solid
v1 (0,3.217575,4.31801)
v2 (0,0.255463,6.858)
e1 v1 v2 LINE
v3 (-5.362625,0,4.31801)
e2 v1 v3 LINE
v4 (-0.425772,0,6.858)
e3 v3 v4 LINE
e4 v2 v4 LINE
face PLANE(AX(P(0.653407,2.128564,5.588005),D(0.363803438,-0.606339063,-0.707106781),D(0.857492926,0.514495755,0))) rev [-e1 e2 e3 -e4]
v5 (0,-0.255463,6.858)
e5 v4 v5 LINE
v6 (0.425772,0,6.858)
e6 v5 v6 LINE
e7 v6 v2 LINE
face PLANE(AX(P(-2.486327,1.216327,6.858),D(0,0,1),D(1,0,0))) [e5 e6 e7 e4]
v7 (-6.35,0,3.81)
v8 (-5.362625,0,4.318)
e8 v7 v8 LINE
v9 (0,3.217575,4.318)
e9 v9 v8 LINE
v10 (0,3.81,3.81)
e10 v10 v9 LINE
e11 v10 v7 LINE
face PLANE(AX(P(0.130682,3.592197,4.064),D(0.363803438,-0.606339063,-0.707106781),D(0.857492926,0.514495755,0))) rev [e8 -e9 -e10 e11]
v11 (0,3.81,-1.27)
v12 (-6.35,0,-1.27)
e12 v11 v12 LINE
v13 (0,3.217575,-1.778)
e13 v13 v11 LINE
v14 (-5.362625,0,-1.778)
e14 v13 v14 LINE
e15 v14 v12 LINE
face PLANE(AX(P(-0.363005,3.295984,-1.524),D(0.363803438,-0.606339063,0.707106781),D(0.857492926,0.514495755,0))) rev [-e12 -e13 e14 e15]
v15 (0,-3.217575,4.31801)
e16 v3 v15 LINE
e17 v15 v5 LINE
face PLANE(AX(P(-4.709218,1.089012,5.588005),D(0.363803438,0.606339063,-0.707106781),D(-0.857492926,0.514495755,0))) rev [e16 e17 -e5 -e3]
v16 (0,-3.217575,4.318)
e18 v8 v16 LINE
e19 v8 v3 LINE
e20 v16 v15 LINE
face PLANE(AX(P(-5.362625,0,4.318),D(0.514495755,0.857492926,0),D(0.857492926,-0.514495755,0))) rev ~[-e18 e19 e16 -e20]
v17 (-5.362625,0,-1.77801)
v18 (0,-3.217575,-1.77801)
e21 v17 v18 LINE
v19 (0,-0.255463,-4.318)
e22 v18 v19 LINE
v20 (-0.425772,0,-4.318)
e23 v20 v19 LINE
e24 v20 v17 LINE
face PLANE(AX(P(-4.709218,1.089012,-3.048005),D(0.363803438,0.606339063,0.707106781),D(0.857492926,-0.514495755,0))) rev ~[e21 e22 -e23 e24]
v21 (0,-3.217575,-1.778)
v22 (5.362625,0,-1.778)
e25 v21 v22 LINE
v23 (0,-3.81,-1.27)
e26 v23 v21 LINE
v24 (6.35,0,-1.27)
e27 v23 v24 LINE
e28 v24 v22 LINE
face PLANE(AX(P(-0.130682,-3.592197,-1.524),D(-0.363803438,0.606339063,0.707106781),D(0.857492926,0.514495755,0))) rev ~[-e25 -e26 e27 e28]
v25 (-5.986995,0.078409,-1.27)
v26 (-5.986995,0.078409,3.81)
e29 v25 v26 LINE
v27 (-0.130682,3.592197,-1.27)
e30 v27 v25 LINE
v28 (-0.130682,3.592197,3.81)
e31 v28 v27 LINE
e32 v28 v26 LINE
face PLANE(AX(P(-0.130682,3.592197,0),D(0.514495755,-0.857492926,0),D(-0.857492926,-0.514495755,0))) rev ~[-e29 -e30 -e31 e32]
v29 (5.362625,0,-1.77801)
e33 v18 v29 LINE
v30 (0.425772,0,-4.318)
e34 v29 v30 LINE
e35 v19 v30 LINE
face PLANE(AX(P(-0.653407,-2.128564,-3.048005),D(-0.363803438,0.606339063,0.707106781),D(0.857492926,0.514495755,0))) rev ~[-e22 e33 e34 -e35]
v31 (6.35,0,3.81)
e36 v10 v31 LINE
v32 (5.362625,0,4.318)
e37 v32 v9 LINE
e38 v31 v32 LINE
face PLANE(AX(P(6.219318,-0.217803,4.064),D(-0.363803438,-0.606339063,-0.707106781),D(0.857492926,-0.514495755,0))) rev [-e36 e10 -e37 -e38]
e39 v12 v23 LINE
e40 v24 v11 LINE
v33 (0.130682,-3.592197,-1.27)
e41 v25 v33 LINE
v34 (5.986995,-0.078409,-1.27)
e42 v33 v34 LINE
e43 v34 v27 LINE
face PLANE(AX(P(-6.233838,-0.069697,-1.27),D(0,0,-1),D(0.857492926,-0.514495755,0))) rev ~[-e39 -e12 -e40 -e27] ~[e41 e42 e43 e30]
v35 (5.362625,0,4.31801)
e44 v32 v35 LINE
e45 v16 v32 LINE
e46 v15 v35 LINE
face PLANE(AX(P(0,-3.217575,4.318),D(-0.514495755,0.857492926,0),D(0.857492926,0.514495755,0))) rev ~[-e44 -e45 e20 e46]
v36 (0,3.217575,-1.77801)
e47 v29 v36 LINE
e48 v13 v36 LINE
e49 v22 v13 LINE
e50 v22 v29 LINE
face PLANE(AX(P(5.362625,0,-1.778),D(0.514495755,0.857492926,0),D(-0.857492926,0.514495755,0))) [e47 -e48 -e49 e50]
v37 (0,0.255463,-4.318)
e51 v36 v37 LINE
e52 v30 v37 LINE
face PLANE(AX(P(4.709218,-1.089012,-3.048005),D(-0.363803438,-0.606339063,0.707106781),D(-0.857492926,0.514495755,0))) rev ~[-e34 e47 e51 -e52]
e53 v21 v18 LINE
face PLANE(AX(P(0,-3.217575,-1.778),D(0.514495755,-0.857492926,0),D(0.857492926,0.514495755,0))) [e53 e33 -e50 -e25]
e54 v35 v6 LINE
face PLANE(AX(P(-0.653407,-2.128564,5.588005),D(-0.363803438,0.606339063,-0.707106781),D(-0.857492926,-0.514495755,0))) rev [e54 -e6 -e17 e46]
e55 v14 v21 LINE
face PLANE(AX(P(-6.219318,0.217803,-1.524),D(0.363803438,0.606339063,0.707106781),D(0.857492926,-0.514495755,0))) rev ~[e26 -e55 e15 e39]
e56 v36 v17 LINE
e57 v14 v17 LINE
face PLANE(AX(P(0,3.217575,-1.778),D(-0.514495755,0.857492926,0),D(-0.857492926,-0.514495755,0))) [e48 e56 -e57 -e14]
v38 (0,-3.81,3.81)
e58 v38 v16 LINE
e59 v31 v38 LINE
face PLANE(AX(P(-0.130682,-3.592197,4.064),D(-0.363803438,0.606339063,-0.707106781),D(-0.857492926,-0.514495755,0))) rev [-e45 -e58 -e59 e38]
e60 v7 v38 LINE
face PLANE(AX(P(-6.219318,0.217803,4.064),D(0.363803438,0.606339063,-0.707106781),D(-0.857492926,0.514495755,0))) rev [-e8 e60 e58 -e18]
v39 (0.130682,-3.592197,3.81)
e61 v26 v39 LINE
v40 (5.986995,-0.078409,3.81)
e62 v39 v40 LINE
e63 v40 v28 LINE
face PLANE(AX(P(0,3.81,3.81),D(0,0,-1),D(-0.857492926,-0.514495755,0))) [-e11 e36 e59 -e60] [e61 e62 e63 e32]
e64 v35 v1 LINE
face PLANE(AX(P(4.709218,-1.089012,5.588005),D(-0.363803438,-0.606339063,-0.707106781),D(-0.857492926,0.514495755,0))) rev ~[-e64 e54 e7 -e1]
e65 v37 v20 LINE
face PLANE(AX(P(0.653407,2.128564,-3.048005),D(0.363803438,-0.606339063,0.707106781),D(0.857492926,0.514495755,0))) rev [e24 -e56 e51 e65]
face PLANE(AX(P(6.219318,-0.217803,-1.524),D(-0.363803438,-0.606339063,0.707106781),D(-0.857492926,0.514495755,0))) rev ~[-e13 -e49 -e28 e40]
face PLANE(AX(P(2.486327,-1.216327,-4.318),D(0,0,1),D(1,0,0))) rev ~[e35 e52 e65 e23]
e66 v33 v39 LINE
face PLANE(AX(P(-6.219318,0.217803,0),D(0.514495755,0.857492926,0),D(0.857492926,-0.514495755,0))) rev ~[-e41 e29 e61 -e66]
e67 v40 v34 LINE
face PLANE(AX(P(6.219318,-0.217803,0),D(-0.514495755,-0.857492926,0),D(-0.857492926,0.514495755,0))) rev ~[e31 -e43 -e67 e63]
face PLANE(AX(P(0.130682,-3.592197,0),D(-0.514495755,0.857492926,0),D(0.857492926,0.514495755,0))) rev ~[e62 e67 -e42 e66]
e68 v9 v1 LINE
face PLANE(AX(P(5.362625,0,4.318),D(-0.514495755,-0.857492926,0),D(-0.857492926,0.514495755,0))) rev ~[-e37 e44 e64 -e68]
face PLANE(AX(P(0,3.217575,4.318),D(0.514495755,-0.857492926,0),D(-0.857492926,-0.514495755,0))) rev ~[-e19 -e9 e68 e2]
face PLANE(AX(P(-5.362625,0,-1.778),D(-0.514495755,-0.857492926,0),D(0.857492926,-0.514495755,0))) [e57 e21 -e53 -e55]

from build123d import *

# Parameters (mm, degrees)
F1_DEPTH  = 4.318
F2_DEPTH  = 1.778
F3_SIZE   = 0.508
F4_SIZE   = 0.508
F5_SIZE   = 0.508
F6_DEPTH  = 2.54
F7_DEPTH  = 2.54
F8_SIZE   = 2.53999
F9_SIZE   = 2.53999
F11_DEPTH = 0.254
F12_DEPTH = 0.254


# Not quite as in the source:
# - a fillet or chamfer is up to 0.001 mm smaller than in the source, because OpenCascade refuses the exact size
# - a feature names something its author has since deleted; it is built from what else it names


with BuildPart() as f1:
    # F0 (on Top) → F1 (new body)
    with BuildSketch(Plane.XY):
        Polygon((-6.35, 0), (0, 0), (0, 3.81), align=None)
        Polygon((0, 3.81), (0, 0), (6.35, 0), align=None)
        Polygon((6.35, 0), (0, 0), (0, -3.81), align=None)
        Polygon((0, -3.81), (0, 0), (-6.35, 0), align=None)
    extrude(amount=F1_DEPTH)

    # F5
    f5_edges = [f1.edges().sort_by_distance(p)[0] for p in [
        (-3.175, -1.905, 4.318),
        (3.175, -1.905, 4.318),
        (3.175, 1.905, 4.318),
        (-3.175, 1.905, 4.318),
    ]]
    chamfer(f5_edges, length=F5_SIZE)

    # F7 (add): a face of the model
    f7_faces = [f1.faces().sort_by_distance(p)[0] for p in [
        (0, 0, 4.318),
    ]]
    extrude(f7_faces, amount=F7_DEPTH)

    # F8 (size 2.54 in the source; OpenCascade refuses exactly that, so slightly less here)
    f8_edges = [f1.edges().sort_by_distance(p)[0] for p in [
        (-2.681313, -1.608788, 6.858),
        (-2.681313, 1.608788, 6.858),
        (2.681313, -1.608788, 6.858),
        (2.681313, 1.608788, 6.858),
    ]]
    chamfer(f8_edges, length=F8_SIZE)


with BuildPart() as f2:
    # F0 (on Top) → F2 (new body)
    with BuildSketch(Plane.XY):
        Polygon((6.35, 0), (0, 0), (0, -3.81), align=None)
        Polygon((0, -3.81), (0, 0), (-6.35, 0), align=None)
        Polygon((0, 3.81), (0, 0), (6.35, 0), align=None)
        Polygon((-6.35, 0), (0, 0), (0, 3.81), align=None)
    extrude(amount=-F2_DEPTH)

    # F3
    f3_edges = [f2.edges().sort_by_distance(p)[0] for p in [
        (3.175, 1.905, -1.778),
        (3.175, -1.905, -1.778),
    ]]
    chamfer(f3_edges, length=F3_SIZE)

    # F4
    f4_edges = [f2.edges().sort_by_distance(p)[0] for p in [
        (-3.421844, 1.756894, -1.778),
        (-3.421844, -1.756894, -1.778),
    ]]
    chamfer(f4_edges, length=F4_SIZE)

    # F6 (add): a face of the model
    f6_faces = [f2.faces().sort_by_distance(p)[0] for p in [
        (0, 0, -1.778),
    ]]
    extrude(f6_faces, amount=F6_DEPTH)

    # F9 (size 2.54 in the source; OpenCascade refuses exactly that, so slightly less here)
    f9_edges = [f2.edges().sort_by_distance(p)[0] for p in [
        (2.681313, 1.608788, -4.318),
        (-2.681313, 1.608788, -4.318),
        (2.681313, -1.608788, -4.318),
        (-2.681313, -1.608788, -4.318),
    ]]
    chamfer(f9_edges, length=F9_SIZE)

    # F10: union F1
    add(f1.part)

    # F11 (cut): faces of the model
    f11_faces = [f2.faces().sort_by_distance(p)[0] for p in [
        (3.175, 1.905, 1.27),
        (-3.175, 1.905, 1.27),
        (-3.175, -1.905, 1.27),
        (3.175, -1.905, 1.27),
    ]]
    extrude(f11_faces, amount=-F11_DEPTH, dir=(0.5144957554, 0.8574929257, 0), mode=Mode.SUBTRACT)

    # F12 (cut): faces of the model
    f12_faces = [f2.faces().sort_by_distance(p)[0] for p in [
        (-3.1169191458, -1.9398485125, 1.27),
        (3.0515781849, -1.9790530891, 1.27),
    ]]
    extrude(f12_faces, amount=-F12_DEPTH, dir=(-0.5144957554, -0.8574929257, 0), mode=Mode.SUBTRACT)


solid = f2.part
